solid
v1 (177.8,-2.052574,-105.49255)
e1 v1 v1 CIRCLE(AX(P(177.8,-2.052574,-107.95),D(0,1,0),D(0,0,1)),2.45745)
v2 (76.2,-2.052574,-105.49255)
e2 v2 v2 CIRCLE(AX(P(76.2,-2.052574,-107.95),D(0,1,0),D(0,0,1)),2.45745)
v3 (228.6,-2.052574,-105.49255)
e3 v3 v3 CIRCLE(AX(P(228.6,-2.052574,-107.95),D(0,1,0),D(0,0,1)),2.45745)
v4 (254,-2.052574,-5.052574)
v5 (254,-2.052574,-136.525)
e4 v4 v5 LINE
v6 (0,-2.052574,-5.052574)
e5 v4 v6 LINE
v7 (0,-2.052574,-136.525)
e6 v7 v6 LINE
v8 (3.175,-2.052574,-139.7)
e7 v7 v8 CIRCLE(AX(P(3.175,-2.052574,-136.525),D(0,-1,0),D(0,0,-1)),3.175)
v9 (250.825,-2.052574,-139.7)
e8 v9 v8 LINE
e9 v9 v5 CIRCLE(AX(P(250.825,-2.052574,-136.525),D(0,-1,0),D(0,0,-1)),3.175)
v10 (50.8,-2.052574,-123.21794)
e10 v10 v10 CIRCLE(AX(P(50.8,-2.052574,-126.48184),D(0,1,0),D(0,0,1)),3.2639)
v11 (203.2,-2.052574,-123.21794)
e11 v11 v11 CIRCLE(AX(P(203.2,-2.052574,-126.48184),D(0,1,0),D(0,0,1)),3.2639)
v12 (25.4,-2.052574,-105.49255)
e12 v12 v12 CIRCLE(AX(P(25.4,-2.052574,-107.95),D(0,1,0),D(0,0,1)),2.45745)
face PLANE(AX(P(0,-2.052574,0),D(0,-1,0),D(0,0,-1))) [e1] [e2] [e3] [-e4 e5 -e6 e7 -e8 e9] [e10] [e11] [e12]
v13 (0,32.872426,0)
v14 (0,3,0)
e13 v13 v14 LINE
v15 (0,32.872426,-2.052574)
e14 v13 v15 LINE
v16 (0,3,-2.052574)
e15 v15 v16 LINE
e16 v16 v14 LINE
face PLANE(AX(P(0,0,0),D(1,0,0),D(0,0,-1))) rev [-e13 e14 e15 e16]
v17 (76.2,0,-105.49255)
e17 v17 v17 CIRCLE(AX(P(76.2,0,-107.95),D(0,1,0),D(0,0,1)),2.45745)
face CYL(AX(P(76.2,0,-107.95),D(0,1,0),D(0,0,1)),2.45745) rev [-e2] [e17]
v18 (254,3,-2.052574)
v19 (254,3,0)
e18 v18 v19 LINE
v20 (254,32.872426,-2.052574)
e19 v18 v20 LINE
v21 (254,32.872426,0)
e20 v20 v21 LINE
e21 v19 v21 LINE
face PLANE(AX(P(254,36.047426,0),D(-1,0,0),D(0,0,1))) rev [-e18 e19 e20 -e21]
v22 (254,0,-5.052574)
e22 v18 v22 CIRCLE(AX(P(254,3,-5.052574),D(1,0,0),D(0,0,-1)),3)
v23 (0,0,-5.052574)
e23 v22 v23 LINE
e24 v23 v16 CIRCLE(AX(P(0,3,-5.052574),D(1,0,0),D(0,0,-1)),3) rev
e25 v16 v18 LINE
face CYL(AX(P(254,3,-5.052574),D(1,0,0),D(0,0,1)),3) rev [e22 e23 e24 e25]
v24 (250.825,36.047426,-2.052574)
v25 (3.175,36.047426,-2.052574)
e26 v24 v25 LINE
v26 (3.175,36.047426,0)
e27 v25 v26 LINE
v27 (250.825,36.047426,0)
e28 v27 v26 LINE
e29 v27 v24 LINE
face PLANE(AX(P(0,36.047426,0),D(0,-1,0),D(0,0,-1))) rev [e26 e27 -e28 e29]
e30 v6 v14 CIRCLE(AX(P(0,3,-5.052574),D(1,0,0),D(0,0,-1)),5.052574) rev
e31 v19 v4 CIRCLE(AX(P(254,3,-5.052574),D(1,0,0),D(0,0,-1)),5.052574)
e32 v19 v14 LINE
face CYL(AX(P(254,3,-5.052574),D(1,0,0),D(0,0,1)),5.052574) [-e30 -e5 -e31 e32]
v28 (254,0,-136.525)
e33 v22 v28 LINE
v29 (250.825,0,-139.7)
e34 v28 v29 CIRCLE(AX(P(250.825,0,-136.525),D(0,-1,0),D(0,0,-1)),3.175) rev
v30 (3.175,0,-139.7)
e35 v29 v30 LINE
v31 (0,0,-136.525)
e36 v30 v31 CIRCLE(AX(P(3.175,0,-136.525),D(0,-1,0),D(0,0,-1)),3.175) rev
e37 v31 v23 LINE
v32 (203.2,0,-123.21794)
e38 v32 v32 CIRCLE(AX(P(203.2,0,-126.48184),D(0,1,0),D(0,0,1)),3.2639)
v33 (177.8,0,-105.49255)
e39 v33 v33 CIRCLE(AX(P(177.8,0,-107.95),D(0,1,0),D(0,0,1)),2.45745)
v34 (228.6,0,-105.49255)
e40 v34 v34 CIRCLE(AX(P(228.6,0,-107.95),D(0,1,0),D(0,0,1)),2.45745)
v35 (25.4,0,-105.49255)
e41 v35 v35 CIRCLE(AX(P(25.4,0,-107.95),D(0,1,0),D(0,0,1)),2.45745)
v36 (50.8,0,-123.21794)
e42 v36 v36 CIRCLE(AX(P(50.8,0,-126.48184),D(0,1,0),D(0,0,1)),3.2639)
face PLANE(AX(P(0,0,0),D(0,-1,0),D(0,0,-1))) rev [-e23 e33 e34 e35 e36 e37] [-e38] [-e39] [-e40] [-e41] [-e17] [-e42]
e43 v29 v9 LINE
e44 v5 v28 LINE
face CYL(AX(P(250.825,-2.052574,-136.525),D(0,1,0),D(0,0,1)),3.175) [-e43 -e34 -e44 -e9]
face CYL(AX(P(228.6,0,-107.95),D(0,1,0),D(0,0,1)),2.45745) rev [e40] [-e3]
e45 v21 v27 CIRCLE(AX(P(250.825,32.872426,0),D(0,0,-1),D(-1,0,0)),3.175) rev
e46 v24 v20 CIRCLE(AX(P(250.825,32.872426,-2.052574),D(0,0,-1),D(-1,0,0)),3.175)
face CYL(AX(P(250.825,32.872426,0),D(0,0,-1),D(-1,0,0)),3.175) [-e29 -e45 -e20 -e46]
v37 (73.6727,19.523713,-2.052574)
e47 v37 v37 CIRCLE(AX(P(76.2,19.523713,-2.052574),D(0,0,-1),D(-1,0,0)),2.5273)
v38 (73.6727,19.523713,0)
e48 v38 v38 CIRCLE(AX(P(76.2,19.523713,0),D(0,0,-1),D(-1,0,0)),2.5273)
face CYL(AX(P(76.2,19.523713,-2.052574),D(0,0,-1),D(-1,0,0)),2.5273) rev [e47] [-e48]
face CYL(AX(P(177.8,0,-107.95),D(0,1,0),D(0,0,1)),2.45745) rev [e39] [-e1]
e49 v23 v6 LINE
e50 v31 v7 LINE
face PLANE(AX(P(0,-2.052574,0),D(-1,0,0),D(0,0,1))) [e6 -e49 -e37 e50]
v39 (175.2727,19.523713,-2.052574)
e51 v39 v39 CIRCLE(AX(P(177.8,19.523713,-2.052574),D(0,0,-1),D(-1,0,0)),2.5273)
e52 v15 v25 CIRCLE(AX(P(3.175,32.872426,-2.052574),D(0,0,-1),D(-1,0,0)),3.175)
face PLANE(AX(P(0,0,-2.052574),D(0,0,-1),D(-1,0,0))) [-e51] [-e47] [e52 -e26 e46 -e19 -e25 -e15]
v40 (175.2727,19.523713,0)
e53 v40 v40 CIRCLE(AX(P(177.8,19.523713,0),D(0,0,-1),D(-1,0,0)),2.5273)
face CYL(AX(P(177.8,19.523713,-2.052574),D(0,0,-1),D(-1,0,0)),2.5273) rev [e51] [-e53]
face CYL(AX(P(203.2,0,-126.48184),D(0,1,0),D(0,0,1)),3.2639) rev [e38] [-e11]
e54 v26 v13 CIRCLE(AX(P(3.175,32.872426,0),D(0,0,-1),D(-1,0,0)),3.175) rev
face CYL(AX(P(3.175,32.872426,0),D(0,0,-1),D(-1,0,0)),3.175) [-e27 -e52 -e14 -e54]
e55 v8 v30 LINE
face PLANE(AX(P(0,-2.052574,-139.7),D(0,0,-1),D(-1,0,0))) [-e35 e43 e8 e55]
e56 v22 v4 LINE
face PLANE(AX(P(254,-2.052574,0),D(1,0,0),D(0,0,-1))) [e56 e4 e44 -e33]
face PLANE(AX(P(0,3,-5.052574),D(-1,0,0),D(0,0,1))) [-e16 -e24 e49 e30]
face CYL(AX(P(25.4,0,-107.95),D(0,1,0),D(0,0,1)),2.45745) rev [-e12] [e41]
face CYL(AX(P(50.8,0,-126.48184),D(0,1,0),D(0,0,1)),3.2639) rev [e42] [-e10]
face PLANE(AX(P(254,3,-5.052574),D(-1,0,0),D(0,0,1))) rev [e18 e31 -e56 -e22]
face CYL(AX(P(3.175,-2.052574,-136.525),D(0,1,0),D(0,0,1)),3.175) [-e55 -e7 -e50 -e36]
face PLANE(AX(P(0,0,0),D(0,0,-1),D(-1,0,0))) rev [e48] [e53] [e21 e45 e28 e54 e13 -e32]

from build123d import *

# Parameters (mm, degrees)
SKETCH1_W                    = 254
SKETCH1_H                    = 139.7
BASE_FLANGE1_DEPTH           = 2.052574
EDGE_FLANGE1_STRIP_W         = 14.210296
EDGE_FLANGE1_STRIP_H         = 2.052574
EDGE_FLANGE1_STRIP_CUT_DEPTH = 254
EDGE_FLANGE1_DEPTH           = 254
F_8_0_199_DIAMETER_HOLE1_D   = 5.0546
F_10_0_1935_DIAMETER_HOLE1_D = 4.9149
F_0_257_DIAMETER_HOLE1_D     = 6.5278
FILLET1_R                    = 3.175


# Sheet-metal steps are written as plain solids
with BuildPart() as part:
    # Sketch1 → Base-Flange1 (new body)
    with BuildSketch(Plane(origin=(0, 0, 0), x_dir=(1, 0, 0), z_dir=(0, 1, 0))):
        with Locations((127, 69.85)):
            Rectangle(SKETCH1_W, SKETCH1_H)
    extrude(amount=-BASE_FLANGE1_DEPTH)

    # Edge-Flange1 strip (across the edge) → Edge-Flange1 strip cut (cut)
    with BuildSketch(Plane(origin=(0, 0, 0), x_dir=(0, 0, -1), z_dir=(1, 0, 0))):
        with Locations((-2.052574, -1.026287)):
            Rectangle(EDGE_FLANGE1_STRIP_W, EDGE_FLANGE1_STRIP_H)
    extrude(amount=EDGE_FLANGE1_STRIP_CUT_DEPTH, mode=Mode.SUBTRACT)

    # Edge-Flange1 section (across the edge) → Edge-Flange1 (add)
    with BuildSketch(Plane(origin=(0, 0, 0), x_dir=(0, 0, -1), z_dir=(1, 0, 0))):
        with BuildLine():
            Line((0, 3), (0, 36.047426))
            Line((0, 36.047426), (2.052574, 36.047426))
            Line((2.052574, 36.047426), (2.052574, 3))
            ThreePointArc((2.052574, 3), (2.931253656, 0.878679656), (5.052574, 0))
            Line((5.052574, 0), (5.052574, -2.052574))
            ThreePointArc((5.052574, -2.052574), (1.479864662, -0.572709338), (0, 3))
        make_face()
    extrude(amount=EDGE_FLANGE1_DEPTH)

    # #8 (0.199) Diameter Hole1 (through all)
    with Locations(Plane(origin=(0, 0, -2.052574), x_dir=(-1, 0, 0), z_dir=(0, 0, -1))):
        with Locations((-177.8, 19.523713), (-76.2, 19.523713)):
            Hole(F_8_0_199_DIAMETER_HOLE1_D / 2)

    # #10 (0.1935) Diameter Hole1 (through all)
    with Locations(Plane(origin=(0, 0, 0), x_dir=(1, 0, 0), z_dir=(0, 1, 0))):
        with Locations((25.4, 107.95), (76.2, 107.95), (177.8, 107.95), (228.6, 107.95)):
            Hole(F_10_0_1935_DIAMETER_HOLE1_D / 2)

    # F (0.257) Diameter Hole1 (through all)
    with Locations(Plane(origin=(0, 0, 0), x_dir=(1, 0, 0), z_dir=(0, 1, 0))):
        with Locations((203.2, 126.48184), (50.8, 126.48184)):
            Hole(F_0_257_DIAMETER_HOLE1_D / 2)

    # Fillet1
    fillet1_edges = [part.edges().sort_by_distance(p)[0] for p in [
        (0, 36.047426, -1.026287),
        (254, 36.047426, -1.026287),
        (0, -1.026287, -139.7),
        (254, -1.026287, -139.7),
    ]]
    fillet(fillet1_edges, radius=FILLET1_R)


solid = part.part
